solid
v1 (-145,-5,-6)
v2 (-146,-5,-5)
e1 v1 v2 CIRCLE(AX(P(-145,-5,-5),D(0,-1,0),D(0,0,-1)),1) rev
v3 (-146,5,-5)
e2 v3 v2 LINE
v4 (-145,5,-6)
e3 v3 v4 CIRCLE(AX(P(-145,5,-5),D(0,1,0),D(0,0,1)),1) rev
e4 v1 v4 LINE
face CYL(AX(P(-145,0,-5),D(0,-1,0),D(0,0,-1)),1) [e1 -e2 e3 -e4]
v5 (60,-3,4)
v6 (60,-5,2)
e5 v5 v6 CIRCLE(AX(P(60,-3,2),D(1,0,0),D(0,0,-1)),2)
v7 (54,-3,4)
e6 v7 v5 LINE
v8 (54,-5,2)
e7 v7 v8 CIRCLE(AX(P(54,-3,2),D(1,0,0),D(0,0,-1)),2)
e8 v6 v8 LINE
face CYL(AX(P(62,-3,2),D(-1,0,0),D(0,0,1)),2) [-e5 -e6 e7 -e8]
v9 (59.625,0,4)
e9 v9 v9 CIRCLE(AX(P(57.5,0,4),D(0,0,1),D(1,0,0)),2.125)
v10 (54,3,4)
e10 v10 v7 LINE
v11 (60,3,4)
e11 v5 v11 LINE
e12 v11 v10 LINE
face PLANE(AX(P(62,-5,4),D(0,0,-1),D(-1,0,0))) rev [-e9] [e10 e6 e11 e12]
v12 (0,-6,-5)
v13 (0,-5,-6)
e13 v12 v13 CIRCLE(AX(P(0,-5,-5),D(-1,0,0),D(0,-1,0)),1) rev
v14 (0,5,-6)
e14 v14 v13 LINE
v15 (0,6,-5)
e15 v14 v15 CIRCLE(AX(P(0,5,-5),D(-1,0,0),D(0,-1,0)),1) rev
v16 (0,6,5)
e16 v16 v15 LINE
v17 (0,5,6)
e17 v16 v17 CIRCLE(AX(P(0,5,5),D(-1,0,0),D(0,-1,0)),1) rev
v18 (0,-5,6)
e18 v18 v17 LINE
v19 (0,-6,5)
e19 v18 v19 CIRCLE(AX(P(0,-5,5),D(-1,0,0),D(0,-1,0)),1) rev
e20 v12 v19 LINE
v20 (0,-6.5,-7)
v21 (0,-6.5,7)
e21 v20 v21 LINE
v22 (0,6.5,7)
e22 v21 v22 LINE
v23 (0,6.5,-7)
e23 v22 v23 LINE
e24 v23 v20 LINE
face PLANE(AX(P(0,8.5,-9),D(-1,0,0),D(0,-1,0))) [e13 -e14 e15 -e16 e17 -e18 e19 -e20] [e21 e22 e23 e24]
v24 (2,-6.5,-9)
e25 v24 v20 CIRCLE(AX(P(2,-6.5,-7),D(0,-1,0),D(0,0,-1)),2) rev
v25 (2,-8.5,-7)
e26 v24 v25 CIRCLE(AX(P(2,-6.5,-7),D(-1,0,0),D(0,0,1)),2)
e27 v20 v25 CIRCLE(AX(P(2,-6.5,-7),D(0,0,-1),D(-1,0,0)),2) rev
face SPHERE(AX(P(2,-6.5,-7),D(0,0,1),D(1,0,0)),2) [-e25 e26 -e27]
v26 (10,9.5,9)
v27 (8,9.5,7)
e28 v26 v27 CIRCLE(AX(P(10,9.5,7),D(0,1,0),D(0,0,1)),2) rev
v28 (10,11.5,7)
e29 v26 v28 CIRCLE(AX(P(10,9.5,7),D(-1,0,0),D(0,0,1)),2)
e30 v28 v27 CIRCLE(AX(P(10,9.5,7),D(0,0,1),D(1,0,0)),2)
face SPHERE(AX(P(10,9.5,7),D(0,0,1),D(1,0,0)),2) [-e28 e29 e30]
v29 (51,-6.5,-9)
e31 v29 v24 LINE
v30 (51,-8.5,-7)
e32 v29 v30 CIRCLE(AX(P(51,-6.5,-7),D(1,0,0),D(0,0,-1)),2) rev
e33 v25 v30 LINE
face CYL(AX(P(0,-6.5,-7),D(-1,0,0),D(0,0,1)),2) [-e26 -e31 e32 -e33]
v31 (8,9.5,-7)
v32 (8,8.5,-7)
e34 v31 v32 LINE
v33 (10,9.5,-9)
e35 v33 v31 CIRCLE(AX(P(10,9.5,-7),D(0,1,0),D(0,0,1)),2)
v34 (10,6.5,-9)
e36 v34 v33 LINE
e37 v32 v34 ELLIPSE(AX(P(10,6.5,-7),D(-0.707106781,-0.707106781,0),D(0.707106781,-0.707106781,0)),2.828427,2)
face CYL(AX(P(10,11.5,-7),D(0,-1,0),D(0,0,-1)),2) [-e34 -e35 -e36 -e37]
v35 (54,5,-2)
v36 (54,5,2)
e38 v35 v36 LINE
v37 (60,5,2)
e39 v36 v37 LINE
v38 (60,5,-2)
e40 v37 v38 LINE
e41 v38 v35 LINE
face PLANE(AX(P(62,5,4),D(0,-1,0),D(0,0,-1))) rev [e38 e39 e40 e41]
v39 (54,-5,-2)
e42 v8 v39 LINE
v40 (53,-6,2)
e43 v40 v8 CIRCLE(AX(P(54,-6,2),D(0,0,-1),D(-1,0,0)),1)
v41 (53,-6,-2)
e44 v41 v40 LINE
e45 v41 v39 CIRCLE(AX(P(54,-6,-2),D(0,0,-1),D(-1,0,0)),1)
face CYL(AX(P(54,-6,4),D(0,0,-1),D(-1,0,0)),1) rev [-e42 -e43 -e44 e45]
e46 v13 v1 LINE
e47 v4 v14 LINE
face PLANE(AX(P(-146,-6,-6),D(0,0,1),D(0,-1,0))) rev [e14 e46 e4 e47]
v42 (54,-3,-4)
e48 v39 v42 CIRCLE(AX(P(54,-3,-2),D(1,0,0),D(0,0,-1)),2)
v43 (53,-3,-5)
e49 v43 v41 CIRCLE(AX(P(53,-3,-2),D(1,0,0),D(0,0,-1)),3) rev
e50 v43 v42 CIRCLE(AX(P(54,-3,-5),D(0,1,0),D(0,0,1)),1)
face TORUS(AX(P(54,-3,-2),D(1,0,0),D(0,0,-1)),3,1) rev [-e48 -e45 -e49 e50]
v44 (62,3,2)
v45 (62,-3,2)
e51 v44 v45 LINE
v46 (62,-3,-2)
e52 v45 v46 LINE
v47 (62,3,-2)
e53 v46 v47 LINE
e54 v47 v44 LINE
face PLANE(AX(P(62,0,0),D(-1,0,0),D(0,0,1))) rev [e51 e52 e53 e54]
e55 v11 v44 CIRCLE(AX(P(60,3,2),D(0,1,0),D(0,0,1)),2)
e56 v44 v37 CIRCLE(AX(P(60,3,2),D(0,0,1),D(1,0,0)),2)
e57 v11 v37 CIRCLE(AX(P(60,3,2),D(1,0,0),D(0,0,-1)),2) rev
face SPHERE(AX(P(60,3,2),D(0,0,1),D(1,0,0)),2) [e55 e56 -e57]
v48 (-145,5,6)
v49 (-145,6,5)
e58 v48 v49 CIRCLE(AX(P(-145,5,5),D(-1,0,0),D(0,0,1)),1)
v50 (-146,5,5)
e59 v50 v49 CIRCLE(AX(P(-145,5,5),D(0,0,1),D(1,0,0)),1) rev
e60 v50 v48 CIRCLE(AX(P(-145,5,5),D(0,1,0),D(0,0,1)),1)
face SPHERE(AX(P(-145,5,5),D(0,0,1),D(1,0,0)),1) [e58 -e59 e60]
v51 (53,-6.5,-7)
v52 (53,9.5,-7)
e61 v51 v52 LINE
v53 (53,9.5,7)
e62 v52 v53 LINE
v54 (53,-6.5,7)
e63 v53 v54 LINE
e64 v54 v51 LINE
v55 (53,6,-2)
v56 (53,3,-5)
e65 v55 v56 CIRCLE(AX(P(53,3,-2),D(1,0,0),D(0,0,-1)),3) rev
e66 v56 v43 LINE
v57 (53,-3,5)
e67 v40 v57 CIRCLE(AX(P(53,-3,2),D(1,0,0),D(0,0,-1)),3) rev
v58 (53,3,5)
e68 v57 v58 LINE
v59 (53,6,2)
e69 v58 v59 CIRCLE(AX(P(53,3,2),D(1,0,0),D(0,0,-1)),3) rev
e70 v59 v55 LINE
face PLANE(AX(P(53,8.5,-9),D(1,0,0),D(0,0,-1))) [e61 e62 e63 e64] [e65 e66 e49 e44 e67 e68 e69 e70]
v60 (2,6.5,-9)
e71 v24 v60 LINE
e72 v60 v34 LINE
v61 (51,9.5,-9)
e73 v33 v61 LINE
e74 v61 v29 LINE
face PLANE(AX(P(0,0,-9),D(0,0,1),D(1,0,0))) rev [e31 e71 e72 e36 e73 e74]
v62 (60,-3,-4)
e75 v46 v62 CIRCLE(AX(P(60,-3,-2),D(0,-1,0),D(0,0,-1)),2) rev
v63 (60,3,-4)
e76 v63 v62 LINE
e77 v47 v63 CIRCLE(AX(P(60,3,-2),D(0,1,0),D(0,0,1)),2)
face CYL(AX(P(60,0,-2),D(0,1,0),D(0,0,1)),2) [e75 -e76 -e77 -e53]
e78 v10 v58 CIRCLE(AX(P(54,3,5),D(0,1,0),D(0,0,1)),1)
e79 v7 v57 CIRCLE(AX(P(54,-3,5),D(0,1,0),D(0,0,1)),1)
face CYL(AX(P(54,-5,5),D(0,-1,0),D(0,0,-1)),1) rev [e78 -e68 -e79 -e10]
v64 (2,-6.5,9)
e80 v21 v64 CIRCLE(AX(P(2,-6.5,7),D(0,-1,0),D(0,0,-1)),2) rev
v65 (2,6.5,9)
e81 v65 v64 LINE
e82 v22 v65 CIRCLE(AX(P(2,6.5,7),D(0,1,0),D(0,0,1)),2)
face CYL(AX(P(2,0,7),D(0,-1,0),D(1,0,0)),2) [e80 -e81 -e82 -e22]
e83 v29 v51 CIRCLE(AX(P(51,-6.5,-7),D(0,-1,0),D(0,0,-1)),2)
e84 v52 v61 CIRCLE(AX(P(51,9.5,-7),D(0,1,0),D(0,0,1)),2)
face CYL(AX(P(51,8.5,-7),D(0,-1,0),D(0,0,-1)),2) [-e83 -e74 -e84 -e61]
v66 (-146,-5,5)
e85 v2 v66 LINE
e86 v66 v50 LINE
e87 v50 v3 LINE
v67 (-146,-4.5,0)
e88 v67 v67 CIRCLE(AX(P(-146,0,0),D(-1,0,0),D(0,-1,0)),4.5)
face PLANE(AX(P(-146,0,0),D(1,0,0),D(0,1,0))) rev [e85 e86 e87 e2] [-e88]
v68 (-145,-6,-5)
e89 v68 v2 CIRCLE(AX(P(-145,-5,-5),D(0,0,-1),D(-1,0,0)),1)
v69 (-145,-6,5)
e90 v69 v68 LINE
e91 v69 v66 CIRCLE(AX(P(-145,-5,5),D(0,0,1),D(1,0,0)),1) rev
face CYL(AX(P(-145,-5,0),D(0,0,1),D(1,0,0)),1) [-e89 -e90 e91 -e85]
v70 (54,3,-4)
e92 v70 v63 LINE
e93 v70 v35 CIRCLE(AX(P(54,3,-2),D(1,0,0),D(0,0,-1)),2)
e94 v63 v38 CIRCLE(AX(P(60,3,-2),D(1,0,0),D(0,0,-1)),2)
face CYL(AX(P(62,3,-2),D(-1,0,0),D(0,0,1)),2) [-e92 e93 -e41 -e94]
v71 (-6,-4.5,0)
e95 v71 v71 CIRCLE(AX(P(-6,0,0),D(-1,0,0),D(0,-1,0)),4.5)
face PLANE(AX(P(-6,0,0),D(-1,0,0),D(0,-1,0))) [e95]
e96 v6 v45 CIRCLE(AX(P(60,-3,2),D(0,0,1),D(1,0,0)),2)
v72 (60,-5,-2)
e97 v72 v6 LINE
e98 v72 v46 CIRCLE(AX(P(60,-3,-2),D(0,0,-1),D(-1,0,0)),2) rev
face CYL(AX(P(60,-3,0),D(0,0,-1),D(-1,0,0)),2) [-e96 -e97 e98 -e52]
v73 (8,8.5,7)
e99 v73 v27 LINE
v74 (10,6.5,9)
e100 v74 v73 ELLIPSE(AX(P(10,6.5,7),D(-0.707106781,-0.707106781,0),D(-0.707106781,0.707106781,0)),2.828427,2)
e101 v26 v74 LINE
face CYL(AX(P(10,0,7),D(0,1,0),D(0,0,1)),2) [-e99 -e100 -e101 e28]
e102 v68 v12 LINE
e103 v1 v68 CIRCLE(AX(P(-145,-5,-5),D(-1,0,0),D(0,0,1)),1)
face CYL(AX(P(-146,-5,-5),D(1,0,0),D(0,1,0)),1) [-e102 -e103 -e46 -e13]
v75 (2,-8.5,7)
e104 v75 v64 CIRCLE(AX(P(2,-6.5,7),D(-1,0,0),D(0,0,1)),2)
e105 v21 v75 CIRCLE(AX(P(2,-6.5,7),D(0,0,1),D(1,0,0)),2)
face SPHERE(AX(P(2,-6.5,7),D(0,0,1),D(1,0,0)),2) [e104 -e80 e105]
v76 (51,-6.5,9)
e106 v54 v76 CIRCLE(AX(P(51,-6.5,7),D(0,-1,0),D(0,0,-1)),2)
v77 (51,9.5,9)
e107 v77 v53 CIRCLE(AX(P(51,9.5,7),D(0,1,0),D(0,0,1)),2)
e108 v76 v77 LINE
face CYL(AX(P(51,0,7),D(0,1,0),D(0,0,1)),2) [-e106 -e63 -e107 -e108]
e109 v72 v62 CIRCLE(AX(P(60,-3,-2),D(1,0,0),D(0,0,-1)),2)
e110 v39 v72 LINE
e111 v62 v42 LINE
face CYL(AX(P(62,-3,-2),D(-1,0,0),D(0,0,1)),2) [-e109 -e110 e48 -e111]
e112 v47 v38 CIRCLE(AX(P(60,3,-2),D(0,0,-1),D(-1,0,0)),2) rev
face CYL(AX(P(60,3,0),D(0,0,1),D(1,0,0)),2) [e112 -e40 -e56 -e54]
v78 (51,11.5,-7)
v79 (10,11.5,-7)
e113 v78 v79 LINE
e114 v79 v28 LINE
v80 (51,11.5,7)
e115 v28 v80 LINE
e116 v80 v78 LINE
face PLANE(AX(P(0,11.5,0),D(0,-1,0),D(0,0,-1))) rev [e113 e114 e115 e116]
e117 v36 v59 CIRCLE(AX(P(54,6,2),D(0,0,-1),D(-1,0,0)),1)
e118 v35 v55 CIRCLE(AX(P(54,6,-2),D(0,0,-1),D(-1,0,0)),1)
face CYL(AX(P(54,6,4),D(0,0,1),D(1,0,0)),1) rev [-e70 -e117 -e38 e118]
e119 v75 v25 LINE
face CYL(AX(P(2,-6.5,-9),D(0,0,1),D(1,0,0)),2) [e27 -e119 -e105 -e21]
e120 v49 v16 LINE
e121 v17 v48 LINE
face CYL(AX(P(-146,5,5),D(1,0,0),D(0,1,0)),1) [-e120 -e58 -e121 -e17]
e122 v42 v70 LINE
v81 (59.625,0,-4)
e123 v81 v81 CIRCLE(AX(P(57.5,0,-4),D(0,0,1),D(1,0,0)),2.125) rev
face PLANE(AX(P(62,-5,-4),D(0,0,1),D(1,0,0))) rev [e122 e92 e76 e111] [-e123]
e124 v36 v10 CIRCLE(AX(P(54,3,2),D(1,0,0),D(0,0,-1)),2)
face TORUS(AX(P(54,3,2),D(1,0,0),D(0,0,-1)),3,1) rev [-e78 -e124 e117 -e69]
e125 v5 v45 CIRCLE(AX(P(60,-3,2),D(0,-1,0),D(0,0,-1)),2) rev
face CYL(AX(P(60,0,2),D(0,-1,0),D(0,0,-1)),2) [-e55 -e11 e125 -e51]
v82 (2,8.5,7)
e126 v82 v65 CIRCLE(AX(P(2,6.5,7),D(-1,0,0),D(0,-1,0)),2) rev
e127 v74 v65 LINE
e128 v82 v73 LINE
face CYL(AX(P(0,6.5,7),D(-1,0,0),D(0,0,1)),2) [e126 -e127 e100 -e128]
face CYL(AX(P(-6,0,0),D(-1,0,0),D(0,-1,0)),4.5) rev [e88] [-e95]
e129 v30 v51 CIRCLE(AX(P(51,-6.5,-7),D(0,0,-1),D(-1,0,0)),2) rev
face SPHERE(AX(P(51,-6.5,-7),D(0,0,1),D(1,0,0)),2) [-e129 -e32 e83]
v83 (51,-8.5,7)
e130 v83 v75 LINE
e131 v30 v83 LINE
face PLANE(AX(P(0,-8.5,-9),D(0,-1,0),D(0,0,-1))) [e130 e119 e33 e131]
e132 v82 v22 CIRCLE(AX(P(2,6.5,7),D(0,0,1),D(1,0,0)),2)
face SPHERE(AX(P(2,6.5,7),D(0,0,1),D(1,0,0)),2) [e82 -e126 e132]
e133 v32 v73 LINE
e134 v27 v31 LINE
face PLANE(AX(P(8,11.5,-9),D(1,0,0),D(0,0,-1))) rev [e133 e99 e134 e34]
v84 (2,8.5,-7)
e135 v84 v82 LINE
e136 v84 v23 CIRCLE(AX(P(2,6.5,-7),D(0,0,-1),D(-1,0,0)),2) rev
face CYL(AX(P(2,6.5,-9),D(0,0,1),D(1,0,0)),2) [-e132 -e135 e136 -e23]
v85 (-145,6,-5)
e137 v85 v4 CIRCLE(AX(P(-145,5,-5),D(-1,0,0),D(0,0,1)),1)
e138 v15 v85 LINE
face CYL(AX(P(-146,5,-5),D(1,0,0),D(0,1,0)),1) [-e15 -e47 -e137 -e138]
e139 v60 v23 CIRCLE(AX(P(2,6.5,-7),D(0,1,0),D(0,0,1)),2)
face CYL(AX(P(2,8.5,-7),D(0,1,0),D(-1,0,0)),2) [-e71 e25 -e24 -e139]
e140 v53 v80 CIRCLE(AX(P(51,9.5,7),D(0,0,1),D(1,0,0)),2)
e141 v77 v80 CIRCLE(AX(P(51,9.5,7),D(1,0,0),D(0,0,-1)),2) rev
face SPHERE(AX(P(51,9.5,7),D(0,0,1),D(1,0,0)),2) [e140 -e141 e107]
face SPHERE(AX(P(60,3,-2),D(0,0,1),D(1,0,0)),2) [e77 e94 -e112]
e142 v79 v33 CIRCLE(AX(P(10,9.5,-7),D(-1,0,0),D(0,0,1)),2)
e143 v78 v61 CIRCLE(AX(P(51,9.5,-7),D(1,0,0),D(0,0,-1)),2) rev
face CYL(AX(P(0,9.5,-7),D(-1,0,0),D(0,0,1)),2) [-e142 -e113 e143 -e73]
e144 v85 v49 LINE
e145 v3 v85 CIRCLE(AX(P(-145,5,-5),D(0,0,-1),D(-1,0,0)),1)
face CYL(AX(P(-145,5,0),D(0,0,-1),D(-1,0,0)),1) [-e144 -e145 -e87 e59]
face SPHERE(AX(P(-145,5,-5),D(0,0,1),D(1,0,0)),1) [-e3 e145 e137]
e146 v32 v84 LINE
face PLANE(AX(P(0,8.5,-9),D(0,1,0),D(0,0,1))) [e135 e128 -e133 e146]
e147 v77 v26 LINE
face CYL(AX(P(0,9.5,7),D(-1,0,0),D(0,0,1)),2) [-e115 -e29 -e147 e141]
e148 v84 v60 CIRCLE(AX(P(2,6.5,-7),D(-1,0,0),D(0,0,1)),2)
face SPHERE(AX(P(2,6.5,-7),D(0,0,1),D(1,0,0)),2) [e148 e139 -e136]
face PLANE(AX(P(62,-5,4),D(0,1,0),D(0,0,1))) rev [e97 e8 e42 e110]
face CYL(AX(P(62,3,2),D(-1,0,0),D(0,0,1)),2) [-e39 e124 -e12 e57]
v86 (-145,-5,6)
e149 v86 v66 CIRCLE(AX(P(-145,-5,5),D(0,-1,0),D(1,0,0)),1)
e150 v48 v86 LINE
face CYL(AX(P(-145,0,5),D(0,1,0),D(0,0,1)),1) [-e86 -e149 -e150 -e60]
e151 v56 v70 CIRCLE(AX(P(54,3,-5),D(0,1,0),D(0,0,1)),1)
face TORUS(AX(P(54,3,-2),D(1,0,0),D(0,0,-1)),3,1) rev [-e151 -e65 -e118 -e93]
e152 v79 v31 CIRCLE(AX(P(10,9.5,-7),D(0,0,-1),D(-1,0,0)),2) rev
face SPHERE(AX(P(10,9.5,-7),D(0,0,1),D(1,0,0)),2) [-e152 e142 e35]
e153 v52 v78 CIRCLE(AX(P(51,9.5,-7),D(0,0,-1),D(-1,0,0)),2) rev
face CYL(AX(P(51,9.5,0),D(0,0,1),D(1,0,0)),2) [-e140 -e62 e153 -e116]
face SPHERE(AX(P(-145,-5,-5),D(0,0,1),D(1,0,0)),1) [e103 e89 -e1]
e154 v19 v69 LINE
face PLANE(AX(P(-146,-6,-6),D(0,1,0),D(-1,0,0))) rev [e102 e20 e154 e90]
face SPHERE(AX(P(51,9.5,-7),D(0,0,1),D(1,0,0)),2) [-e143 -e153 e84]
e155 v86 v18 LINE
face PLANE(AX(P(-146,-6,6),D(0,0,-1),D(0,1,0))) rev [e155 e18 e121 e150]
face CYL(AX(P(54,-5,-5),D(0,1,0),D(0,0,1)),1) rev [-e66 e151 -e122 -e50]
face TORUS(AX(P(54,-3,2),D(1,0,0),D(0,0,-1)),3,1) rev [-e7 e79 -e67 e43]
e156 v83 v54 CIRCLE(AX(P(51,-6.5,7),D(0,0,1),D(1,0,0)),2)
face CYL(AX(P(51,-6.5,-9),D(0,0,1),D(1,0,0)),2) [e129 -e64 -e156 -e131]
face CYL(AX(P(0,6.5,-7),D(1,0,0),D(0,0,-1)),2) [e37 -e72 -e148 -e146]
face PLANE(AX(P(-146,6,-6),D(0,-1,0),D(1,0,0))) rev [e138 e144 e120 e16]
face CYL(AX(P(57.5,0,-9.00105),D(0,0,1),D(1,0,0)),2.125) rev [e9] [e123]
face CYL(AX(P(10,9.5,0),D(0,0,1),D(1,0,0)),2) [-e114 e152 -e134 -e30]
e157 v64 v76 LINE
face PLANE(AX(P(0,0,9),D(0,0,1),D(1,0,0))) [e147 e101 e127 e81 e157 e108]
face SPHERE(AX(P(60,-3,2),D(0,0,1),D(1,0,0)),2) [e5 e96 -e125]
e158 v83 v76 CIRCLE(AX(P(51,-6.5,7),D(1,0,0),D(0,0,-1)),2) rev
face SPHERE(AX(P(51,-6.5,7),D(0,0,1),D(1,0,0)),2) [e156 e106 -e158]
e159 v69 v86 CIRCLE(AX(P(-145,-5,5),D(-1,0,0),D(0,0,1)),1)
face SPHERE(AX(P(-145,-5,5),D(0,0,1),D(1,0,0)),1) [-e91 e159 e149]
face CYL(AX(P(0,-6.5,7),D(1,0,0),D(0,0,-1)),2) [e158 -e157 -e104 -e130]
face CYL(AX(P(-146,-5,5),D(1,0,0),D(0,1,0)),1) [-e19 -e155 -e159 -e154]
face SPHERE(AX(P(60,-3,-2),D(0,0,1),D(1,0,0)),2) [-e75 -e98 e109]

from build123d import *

# Parameters (mm, degrees)
BOSS_EXTRUDE1_DEPTH      = 9
BOSS_EXTRUDE1_DEPTH_BACK = 9
SKETCH1_W                = 53
SKETCH1_H                = 17
SKETCH2_W                = 45
SKETCH2_H                = 18
BOSS_EXTRUDE2_DEPTH      = 3
SKETCH3_W                = 8
SKETCH3_H                = 10
BOSS_EXTRUDE3_DEPTH      = 9
SKETCH4_W                = 12
SKETCH4_H                = 12
BOSS_EXTRUDE4_DEPTH      = 146
CUT_EXTRUDE1_REACH       = 149.028
SKETCH6_R                = 2.125
FILLET2_R                = 2
FILLET3_R                = 1
SKETCH7_R                = 4.5
CUT_EXTRUDE2_DEPTH       = 140
FILLET4_R                = 1


with BuildPart() as part:
    # Sketch1 → Boss-Extrude1 (new, two sides: drawn at the far end of the back side and taken through both)
    with BuildSketch(Plane.XY.offset(-BOSS_EXTRUDE1_DEPTH_BACK)):
        with Locations((26.5, 0)):
            Rectangle(SKETCH1_W, SKETCH1_H)
    extrude(amount=BOSS_EXTRUDE1_DEPTH + BOSS_EXTRUDE1_DEPTH_BACK)

    # Sketch2 → Boss-Extrude2 (add)
    with BuildSketch(Plane(origin=(0, 8.5, 0), x_dir=(1, 0, 0), z_dir=(0, 1, 0))):
        with Locations((30.5, 0)):
            Rectangle(SKETCH2_W, SKETCH2_H)
    extrude(amount=BOSS_EXTRUDE2_DEPTH)

    # Sketch3 → Boss-Extrude3 (add)
    with BuildSketch(Plane(origin=(53, 0, 0), x_dir=(0, 0, -1), z_dir=(1, 0, 0))):
        Rectangle(SKETCH3_W, SKETCH3_H)
    extrude(amount=BOSS_EXTRUDE3_DEPTH)

    # Sketch4 → Boss-Extrude4 (add)
    with BuildSketch(Plane.ZY):
        Rectangle(SKETCH4_W, SKETCH4_H)
    extrude(amount=BOSS_EXTRUDE4_DEPTH)

    # Sketch6 → Cut-Extrude1 (cut, up to next)
    with BuildSketch(Plane.XY.offset(4), mode=Mode.PRIVATE) as cut_extrude1_sk1:
        with Locations((57.5, 0)):
            Circle(SKETCH6_R)
    cut_extrude1_tool1 = extrude(cut_extrude1_sk1.sketch, amount=-CUT_EXTRUDE1_REACH, mode=Mode.PRIVATE) & part.part
    add(cut_extrude1_tool1.solids().sort_by_distance((57.5, 0, 4))[0], mode=Mode.SUBTRACT)

    # Fillet2
    fillet2_edges = [part.edges().sort_by_distance(p)[0] for p in [
        (4, 8.5, 9),
        (8, 10, 9),
        (53, 1.5, 9),
        (0, 0, 9),
        (30.5, 11.5, 9),
        (8, 11.5, 0),
        (30.5, 11.5, -9),
        (53, 11.5, 0),
        (26.5, -8.5, -9),
        (0, -8.5, 0),
        (26.5, -8.5, 9),
        (53, -8.5, 0),
        (57.5, -5, -4),
        (62, 0, -4),
        (62, -5, 0),
        (57.5, -5, 4),
        (62, 0, 4),
        (0, 8.5, 0),
        (0, 0, -9),
        (4, 8.5, -9),
        (57.5, 5, 4),
        (62, 5, 0),
        (57.5, 5, -4),
        (53, 1.5, -9),
        (8, 10, -9),
    ]]
    fillet(fillet2_edges, radius=FILLET2_R)

    # Fillet3
    fillet3_edges = [part.edges().sort_by_distance(p)[0] for p in [
        (53, -4.414213562, 3.414213562),
        (53, 0, 4),
        (53, 4.414213562, 3.414213562),
        (53, 5, 0),
        (53, 4.414213562, -3.414213562),
        (53, 0, -4),
        (53, -4.414213562, -3.414213562),
        (53, -5, 0),
    ]]
    fillet(fillet3_edges, radius=FILLET3_R)

    # Sketch7 → Cut-Extrude2 (cut)
    with BuildSketch(Plane.ZY.offset(146)):
        Circle(SKETCH7_R)
    extrude(amount=-CUT_EXTRUDE2_DEPTH, mode=Mode.SUBTRACT)

    # Fillet4
    fillet4_edges = [part.edges().sort_by_distance(p)[0] for p in [
        (-146, 0, -6),
        (-146, -6, 0),
        (-73, -6, 6),
        (-73, -6, -6),
        (-146, 6, 0),
        (-73, 6, -6),
        (-146, 0, 6),
        (-73, 6, 6),
    ]]
    fillet(fillet4_edges, radius=FILLET4_R)


solid = part.part
